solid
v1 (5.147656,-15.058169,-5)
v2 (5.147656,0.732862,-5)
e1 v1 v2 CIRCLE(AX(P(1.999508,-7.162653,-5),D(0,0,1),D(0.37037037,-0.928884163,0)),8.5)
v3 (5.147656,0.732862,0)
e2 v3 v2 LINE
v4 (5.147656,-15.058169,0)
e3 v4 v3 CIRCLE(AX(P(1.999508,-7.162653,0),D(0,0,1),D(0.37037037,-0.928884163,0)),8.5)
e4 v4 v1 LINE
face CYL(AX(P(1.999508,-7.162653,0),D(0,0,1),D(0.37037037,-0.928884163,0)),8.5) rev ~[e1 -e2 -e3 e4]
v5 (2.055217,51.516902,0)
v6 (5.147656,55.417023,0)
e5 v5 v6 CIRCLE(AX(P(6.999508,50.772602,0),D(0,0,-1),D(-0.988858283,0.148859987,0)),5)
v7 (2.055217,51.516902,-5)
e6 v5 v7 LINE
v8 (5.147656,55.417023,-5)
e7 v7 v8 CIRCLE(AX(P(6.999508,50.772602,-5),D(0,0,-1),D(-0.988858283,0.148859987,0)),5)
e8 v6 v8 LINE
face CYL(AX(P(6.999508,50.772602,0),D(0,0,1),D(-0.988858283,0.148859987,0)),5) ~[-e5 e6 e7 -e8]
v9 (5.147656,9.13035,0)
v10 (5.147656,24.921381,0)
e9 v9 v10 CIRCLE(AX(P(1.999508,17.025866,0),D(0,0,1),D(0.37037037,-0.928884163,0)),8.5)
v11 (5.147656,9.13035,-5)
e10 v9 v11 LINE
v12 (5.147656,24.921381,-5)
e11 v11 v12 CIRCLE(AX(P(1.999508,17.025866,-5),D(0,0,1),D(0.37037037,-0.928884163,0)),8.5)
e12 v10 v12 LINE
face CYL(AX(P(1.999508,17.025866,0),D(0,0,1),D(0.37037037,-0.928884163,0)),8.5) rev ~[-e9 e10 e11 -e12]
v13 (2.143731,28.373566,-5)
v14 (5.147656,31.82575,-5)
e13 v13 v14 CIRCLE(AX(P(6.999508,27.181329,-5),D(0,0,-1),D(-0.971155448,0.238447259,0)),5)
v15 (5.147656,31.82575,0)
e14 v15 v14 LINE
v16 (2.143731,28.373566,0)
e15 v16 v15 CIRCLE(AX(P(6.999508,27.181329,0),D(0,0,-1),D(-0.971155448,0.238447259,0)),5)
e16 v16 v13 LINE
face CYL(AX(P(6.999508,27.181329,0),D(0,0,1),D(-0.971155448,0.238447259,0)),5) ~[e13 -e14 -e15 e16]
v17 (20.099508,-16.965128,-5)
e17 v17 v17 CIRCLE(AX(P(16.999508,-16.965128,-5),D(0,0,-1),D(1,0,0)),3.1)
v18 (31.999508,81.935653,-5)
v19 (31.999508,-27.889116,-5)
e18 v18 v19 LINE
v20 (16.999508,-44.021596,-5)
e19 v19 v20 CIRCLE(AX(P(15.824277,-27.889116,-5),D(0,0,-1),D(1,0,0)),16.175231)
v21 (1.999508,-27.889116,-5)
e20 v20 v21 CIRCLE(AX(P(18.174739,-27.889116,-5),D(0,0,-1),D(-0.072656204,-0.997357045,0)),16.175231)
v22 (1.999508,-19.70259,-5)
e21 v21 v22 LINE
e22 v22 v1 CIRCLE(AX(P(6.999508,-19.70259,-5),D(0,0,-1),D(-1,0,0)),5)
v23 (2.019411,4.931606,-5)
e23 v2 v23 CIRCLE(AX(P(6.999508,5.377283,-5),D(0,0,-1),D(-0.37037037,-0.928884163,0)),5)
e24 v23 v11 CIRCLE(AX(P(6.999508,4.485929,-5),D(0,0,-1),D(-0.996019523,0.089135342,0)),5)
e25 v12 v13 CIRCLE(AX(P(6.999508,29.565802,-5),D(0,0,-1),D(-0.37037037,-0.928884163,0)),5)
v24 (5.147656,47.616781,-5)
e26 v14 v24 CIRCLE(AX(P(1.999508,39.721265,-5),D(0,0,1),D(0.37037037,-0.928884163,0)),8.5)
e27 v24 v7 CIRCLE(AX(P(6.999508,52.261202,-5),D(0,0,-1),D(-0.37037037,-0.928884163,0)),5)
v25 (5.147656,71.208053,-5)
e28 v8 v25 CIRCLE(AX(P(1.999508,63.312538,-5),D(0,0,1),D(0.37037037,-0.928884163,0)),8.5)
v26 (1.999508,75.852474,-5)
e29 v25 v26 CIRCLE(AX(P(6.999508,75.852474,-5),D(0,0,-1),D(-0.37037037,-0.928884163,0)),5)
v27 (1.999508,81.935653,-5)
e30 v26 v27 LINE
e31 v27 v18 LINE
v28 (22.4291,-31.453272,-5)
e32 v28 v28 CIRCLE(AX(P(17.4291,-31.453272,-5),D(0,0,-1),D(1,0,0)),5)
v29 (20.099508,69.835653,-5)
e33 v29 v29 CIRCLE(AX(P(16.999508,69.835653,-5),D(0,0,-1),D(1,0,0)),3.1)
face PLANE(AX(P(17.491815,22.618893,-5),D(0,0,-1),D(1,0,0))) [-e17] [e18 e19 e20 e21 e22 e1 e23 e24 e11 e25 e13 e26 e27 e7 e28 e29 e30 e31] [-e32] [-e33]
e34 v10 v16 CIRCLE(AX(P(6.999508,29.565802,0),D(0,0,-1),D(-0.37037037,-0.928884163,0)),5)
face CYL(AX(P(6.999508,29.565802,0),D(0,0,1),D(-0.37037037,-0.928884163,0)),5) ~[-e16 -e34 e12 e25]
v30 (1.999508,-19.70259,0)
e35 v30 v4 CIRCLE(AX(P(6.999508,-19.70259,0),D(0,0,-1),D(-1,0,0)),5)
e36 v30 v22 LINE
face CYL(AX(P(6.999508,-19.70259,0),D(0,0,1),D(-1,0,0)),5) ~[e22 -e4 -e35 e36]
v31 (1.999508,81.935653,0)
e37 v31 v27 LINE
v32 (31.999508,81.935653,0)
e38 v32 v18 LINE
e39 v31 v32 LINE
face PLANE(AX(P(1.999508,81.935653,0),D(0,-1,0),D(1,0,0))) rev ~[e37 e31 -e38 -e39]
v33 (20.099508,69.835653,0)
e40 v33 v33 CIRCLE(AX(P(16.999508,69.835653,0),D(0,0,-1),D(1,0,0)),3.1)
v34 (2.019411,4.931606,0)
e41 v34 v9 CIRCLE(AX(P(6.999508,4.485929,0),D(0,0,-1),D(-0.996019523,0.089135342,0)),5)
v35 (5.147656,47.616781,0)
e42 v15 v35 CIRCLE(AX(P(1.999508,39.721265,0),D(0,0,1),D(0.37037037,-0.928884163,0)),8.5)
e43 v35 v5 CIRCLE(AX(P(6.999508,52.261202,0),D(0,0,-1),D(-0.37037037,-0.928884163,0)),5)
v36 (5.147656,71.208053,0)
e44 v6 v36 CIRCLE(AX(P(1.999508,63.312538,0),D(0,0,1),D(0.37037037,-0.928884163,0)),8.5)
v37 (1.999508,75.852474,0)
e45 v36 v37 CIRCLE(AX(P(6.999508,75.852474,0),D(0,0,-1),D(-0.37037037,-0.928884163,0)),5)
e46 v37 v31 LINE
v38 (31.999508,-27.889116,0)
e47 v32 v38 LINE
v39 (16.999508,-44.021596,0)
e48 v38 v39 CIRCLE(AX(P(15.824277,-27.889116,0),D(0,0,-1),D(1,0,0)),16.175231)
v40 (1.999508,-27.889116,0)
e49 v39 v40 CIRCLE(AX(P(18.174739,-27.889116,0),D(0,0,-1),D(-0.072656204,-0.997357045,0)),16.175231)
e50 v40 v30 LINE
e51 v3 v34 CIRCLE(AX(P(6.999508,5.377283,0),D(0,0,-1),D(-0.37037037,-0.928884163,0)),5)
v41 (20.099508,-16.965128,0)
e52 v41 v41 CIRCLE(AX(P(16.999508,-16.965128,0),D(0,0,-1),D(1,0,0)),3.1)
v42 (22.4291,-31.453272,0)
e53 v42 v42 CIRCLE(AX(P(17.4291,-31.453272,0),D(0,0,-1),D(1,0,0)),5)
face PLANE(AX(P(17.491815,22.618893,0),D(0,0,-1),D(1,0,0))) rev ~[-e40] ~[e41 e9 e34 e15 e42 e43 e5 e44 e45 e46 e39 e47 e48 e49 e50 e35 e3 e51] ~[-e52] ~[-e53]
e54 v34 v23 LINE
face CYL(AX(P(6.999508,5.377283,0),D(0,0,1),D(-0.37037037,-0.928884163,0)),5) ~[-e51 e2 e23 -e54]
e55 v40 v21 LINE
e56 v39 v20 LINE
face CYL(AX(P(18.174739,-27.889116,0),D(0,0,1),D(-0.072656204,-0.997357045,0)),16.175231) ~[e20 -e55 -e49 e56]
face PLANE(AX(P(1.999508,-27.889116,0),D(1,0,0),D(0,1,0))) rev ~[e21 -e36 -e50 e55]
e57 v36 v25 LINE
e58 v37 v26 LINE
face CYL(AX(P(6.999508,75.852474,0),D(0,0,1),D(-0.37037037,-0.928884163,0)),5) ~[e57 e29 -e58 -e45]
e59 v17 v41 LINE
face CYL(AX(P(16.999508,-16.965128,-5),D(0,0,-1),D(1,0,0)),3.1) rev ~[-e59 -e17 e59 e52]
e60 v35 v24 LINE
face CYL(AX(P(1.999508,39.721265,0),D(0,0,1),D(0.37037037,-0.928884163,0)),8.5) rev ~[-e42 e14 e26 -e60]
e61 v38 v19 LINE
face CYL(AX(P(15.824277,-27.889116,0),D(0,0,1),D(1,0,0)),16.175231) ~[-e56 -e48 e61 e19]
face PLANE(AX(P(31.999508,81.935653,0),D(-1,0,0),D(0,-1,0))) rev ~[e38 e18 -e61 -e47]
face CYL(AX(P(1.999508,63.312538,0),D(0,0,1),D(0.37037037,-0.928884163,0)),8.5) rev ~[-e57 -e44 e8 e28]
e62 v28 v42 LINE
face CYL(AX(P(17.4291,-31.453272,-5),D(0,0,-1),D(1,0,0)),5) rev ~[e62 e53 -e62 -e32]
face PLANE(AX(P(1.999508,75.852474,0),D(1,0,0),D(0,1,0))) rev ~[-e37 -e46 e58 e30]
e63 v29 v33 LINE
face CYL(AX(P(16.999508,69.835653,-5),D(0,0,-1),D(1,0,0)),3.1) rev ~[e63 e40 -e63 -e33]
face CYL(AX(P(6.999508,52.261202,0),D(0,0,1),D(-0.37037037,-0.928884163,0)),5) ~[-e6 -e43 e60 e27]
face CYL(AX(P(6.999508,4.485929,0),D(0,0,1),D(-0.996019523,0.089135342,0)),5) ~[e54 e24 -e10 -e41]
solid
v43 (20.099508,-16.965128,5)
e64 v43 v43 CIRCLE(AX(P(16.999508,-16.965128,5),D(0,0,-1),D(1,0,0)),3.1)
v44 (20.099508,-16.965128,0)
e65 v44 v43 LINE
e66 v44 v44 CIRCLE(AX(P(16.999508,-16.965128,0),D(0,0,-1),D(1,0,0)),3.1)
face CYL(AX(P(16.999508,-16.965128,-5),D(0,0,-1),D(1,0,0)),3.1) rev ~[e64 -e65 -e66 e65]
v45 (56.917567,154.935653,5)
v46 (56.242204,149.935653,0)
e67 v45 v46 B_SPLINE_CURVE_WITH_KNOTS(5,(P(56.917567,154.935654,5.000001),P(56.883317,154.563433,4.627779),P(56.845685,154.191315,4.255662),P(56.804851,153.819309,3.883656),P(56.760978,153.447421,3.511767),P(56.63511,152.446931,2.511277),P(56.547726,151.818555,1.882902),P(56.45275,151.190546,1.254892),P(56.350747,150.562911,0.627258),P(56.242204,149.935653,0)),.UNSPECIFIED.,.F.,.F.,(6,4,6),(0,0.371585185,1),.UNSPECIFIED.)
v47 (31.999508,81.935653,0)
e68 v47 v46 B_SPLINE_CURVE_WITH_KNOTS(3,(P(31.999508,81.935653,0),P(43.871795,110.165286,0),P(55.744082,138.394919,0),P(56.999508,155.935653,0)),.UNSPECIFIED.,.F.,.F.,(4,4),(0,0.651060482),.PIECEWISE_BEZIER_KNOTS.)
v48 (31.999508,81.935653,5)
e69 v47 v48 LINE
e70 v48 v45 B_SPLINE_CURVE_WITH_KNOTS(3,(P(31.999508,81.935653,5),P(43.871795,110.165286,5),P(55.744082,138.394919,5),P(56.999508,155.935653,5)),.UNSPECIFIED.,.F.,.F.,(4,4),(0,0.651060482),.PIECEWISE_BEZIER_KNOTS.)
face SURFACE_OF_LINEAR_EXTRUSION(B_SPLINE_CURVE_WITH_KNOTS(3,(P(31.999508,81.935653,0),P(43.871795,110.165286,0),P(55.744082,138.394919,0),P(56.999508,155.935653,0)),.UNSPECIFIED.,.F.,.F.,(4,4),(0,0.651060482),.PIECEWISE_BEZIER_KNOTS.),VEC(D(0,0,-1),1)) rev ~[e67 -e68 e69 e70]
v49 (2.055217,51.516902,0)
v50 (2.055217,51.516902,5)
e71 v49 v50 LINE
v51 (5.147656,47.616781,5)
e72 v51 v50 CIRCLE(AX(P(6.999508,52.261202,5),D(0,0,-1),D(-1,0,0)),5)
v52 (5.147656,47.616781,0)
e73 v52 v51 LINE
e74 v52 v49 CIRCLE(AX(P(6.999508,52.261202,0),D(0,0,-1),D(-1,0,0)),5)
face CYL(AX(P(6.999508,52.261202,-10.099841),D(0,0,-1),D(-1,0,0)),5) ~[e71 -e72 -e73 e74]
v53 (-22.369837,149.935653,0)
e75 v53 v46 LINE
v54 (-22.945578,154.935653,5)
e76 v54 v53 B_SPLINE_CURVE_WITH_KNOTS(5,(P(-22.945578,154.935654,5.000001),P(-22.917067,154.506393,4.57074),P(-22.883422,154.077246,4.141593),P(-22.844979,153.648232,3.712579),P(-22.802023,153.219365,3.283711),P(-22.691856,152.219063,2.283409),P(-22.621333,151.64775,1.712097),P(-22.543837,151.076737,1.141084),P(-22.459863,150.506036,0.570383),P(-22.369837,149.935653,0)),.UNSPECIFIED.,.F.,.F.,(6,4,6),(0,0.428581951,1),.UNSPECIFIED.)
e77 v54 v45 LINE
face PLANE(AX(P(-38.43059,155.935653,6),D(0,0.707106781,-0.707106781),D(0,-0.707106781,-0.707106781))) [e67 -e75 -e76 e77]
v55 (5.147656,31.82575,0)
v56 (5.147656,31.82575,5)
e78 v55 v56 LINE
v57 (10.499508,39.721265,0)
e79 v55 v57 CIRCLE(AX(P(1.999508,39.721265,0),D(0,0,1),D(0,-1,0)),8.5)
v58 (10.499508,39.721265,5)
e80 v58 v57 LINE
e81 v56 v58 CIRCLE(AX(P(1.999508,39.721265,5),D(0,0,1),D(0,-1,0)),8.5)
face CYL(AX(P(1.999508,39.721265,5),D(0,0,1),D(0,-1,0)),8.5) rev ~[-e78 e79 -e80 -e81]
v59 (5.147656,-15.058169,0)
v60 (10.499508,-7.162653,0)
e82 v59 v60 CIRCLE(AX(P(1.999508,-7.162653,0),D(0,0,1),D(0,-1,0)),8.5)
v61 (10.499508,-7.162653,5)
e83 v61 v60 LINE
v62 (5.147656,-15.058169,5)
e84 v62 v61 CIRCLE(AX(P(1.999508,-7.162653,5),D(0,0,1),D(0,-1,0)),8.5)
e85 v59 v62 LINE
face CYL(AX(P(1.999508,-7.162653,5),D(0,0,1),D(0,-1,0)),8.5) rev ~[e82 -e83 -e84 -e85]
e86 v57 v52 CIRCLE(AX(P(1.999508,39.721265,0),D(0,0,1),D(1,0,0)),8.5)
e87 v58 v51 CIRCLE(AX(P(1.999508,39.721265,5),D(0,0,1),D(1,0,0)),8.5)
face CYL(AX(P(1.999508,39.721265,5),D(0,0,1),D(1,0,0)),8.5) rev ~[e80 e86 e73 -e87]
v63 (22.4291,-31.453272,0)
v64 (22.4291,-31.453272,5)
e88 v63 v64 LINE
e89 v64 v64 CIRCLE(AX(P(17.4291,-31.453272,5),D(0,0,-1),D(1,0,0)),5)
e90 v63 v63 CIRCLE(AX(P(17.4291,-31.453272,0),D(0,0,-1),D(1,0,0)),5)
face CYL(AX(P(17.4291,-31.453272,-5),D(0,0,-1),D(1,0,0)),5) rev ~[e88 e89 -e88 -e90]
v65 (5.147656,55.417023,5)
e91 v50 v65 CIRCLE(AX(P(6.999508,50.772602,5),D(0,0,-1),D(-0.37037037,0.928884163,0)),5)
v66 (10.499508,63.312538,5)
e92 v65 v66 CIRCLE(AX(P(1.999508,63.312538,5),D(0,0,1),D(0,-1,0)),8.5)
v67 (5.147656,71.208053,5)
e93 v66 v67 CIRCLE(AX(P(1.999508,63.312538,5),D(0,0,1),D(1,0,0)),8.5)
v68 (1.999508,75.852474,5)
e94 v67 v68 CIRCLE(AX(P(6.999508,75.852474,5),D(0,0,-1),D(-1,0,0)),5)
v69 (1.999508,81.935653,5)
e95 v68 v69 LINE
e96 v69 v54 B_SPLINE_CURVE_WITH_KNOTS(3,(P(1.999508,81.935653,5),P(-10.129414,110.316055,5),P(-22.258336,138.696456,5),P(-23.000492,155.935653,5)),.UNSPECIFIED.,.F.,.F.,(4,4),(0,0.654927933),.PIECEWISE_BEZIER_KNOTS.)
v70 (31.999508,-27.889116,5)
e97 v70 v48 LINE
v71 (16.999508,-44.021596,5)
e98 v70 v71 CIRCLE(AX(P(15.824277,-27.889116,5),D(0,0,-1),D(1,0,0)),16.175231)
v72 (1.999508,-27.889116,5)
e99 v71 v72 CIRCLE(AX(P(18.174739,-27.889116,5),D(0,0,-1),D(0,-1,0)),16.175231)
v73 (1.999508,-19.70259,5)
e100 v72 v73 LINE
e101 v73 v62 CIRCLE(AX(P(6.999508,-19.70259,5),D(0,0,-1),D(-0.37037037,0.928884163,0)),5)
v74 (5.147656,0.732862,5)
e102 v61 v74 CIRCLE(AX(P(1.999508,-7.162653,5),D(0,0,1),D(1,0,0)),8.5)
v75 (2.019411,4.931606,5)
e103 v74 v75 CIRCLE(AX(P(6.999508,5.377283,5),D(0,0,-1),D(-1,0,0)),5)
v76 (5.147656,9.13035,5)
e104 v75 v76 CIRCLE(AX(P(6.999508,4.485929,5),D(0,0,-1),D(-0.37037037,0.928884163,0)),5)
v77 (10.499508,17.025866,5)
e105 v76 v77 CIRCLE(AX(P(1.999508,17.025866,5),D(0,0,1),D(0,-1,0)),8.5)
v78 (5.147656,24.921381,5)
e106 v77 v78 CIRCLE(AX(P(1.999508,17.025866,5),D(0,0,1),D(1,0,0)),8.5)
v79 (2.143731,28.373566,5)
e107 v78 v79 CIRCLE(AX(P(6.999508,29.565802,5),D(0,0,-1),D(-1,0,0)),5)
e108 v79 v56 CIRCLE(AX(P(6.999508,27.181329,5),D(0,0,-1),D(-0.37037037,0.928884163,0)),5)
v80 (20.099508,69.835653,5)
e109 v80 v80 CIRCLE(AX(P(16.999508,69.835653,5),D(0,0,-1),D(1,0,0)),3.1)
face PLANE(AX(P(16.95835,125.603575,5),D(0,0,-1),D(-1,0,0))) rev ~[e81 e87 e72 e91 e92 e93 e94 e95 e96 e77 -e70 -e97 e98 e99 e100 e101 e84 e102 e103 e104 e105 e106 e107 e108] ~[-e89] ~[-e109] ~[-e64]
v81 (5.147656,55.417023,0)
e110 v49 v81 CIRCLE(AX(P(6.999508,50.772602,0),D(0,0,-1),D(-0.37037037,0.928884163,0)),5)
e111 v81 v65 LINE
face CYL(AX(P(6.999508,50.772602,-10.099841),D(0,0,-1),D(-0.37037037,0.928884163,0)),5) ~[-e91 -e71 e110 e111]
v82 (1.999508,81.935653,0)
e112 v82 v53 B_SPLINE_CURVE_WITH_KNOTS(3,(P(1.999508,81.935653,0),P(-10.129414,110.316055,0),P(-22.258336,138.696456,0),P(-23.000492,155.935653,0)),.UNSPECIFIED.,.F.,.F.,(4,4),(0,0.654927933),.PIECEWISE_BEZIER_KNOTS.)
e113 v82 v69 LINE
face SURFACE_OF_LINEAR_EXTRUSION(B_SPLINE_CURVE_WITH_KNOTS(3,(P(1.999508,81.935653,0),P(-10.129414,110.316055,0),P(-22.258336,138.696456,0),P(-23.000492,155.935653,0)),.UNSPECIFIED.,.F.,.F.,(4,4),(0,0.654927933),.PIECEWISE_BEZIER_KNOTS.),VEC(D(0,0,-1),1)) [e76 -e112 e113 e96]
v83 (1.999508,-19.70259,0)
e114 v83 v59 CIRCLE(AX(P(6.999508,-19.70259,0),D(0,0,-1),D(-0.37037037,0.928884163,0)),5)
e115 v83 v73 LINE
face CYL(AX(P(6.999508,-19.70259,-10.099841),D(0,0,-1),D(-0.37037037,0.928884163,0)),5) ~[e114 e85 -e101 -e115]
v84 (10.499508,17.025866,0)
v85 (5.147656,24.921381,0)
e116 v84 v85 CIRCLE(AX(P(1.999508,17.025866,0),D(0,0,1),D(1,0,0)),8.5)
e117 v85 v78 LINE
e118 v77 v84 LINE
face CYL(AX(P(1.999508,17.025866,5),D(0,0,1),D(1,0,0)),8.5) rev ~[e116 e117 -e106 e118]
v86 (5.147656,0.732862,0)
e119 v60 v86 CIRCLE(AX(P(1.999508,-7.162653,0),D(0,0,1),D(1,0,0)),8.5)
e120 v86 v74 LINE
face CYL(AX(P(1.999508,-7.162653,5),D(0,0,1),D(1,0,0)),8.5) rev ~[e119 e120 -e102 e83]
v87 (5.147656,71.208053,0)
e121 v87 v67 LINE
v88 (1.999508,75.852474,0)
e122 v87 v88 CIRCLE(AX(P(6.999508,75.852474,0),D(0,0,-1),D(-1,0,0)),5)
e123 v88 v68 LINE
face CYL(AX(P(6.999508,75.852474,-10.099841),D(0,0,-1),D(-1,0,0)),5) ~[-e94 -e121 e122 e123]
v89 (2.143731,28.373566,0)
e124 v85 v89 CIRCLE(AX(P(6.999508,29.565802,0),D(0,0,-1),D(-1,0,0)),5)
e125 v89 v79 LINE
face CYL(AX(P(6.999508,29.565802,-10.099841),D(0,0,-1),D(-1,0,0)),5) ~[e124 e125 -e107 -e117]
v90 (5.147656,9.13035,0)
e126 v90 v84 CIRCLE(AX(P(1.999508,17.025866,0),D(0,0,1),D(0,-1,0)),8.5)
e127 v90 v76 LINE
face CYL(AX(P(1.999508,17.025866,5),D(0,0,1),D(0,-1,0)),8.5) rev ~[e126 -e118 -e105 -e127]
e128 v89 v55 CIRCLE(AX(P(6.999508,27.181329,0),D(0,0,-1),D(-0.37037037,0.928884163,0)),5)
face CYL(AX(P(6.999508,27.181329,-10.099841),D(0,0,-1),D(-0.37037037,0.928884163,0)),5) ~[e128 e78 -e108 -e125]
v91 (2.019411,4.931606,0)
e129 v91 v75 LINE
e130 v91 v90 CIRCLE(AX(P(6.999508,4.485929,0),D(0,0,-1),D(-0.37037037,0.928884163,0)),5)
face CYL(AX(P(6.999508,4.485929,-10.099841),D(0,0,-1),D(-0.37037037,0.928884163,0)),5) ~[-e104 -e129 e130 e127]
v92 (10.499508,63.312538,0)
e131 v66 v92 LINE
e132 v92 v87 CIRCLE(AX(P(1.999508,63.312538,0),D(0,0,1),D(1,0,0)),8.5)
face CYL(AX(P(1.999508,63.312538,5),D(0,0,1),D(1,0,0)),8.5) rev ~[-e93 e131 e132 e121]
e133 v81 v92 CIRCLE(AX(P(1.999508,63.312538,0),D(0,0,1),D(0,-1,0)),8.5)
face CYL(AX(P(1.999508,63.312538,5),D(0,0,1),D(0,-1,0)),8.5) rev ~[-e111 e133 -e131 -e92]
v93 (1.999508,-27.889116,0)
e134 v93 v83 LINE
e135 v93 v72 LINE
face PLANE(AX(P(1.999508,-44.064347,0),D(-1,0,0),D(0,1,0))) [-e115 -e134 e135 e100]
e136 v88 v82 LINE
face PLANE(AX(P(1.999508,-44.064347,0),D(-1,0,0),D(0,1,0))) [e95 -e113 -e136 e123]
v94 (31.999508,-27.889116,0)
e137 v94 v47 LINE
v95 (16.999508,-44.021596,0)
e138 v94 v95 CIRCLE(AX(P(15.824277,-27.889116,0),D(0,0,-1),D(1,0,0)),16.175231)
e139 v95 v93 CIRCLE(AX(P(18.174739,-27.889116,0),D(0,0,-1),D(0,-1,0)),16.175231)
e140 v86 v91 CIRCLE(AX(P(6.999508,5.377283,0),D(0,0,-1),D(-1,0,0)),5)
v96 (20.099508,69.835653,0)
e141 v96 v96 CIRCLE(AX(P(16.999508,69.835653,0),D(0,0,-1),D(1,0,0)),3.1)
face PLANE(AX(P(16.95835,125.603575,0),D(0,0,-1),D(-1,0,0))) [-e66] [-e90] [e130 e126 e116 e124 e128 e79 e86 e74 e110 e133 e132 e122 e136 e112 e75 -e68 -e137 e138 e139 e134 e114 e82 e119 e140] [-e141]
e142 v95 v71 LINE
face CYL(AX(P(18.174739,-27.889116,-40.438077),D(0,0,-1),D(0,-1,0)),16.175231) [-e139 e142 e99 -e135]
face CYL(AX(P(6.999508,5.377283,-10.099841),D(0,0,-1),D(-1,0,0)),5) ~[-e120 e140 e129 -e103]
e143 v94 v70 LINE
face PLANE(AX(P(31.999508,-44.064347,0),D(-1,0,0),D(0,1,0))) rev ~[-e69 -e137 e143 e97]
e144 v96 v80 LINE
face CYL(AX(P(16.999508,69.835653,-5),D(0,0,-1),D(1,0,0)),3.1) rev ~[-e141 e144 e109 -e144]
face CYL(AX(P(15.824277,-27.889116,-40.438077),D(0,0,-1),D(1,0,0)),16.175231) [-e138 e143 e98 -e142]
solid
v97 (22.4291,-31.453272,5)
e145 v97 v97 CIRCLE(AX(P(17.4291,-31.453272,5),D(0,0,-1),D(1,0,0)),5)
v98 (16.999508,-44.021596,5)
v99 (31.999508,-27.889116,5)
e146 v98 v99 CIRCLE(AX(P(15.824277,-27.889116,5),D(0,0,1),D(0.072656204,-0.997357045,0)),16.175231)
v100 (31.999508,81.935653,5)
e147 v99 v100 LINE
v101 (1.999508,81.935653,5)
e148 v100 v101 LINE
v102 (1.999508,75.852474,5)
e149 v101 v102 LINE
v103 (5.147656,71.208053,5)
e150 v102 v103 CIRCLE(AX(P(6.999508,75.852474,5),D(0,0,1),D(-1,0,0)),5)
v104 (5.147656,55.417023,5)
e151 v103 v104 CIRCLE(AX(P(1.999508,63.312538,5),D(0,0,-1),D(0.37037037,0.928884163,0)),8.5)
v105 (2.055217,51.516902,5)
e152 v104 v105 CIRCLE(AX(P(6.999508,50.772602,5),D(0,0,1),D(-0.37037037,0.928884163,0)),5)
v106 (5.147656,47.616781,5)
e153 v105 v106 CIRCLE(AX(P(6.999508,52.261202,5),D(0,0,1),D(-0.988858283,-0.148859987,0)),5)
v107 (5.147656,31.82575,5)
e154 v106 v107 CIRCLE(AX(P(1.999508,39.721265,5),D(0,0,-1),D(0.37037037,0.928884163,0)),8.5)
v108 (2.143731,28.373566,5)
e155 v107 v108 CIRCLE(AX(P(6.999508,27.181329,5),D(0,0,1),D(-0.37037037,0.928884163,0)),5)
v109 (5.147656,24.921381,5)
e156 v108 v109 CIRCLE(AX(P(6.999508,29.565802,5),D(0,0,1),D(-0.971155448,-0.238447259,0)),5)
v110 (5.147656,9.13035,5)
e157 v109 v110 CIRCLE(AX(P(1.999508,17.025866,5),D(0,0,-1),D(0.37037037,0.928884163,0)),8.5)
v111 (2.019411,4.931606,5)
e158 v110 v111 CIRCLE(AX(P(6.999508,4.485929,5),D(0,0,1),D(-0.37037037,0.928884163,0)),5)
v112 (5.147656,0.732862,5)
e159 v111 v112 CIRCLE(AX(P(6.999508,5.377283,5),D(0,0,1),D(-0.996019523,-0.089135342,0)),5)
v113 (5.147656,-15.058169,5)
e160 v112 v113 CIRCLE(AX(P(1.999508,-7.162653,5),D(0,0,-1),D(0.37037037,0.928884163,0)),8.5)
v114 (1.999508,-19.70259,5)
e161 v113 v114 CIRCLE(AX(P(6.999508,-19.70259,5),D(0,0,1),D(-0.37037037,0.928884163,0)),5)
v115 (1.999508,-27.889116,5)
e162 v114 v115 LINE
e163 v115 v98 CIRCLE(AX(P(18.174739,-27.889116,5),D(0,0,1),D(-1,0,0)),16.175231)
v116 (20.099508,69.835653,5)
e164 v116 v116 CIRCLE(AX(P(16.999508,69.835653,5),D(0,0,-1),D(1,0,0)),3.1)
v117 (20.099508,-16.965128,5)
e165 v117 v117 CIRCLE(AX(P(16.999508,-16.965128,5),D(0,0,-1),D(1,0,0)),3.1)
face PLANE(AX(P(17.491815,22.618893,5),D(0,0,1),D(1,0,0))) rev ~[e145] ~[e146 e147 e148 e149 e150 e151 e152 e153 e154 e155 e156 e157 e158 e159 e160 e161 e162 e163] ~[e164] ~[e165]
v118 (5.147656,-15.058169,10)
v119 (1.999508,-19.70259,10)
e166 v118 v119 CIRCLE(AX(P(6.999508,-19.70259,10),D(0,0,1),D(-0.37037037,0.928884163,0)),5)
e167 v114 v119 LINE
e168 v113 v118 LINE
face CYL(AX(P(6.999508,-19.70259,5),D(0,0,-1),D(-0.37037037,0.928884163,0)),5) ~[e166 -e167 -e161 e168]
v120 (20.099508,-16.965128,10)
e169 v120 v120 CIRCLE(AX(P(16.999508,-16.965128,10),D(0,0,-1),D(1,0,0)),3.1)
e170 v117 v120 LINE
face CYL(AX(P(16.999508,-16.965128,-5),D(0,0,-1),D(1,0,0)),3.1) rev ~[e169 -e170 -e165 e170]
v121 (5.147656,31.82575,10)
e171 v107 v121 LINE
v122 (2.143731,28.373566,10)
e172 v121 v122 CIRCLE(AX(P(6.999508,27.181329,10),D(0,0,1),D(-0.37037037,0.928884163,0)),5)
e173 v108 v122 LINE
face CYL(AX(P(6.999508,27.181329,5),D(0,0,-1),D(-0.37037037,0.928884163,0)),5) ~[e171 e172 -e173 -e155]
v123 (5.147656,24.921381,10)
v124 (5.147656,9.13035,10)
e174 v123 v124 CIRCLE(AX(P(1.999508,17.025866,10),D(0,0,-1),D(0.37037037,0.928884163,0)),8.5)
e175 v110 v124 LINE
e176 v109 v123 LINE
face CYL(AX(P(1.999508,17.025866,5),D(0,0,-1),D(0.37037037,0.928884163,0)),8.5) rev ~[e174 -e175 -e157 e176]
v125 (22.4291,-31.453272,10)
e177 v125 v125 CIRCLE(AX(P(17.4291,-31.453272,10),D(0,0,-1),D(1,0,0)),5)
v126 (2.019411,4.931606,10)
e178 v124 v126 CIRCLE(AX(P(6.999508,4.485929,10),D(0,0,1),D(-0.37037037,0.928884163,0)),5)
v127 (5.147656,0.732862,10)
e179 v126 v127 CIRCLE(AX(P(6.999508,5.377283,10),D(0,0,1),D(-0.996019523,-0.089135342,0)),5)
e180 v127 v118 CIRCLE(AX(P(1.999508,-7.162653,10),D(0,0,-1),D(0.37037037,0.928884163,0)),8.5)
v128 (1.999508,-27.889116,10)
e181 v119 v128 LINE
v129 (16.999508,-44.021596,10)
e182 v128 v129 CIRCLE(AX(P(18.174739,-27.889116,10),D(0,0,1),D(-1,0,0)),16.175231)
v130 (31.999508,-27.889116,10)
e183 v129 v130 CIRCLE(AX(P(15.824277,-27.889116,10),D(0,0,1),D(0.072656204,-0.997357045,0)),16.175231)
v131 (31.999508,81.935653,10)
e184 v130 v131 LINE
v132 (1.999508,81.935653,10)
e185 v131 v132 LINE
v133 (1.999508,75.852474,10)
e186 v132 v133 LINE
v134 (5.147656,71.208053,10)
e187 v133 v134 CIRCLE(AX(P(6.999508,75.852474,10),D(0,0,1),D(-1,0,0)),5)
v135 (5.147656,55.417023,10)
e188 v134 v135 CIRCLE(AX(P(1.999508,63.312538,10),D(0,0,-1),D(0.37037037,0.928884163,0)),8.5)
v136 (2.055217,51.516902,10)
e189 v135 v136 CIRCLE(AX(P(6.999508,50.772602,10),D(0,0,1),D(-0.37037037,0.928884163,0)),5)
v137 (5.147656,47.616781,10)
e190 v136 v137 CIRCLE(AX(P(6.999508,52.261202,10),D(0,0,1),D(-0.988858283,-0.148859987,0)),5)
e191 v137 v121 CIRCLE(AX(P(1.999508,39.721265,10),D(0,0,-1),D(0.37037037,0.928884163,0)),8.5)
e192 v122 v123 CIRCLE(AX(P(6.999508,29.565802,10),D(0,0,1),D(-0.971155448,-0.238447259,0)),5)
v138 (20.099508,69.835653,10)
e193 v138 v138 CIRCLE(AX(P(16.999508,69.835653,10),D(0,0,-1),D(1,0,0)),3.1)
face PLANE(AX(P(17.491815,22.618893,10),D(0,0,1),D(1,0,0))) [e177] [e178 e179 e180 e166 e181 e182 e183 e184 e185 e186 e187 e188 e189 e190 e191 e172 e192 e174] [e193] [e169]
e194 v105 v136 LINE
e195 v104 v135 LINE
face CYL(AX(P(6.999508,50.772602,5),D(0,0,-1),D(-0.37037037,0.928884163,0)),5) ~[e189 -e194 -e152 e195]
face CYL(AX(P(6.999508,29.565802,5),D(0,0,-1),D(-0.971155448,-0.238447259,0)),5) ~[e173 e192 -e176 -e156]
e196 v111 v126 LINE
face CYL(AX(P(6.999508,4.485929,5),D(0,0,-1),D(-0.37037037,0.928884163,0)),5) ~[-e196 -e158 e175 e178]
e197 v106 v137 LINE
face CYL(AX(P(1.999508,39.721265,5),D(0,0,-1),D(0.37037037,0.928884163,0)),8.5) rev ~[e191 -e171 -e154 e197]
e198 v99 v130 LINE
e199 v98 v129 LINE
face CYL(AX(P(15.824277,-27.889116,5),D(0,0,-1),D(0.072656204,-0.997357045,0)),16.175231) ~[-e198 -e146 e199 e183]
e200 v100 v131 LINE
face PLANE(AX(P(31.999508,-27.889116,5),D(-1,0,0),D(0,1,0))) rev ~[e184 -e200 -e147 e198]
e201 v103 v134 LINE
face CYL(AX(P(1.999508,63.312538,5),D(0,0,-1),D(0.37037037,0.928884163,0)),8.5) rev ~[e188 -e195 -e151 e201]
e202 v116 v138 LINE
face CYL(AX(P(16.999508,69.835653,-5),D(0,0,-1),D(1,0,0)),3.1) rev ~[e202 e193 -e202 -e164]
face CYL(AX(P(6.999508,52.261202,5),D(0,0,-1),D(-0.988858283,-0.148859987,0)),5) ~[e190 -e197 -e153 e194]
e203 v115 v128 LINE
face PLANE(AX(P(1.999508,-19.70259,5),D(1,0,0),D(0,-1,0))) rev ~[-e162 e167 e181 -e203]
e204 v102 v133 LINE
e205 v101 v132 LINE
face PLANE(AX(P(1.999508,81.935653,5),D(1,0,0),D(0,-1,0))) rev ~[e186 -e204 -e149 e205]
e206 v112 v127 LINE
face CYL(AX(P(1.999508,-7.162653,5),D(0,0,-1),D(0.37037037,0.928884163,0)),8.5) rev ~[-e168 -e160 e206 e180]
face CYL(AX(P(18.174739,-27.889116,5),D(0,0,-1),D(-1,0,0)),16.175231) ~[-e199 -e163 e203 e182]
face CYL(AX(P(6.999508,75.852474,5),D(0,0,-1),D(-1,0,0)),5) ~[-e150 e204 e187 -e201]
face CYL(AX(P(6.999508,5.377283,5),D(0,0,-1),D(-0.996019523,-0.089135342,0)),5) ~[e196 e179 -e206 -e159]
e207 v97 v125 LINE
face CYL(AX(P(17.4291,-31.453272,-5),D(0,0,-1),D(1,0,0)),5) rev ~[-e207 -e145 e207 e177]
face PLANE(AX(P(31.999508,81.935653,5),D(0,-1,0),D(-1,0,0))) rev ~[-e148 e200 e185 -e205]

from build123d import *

# Parameters (mm, degrees)
F0_W         = 30
F0_H         = 126
F1_DEPTH     = 5
F2_T1_DEPTH  = 85.8761543395
F4_DEPTH     = 25
F5_T1_DEPTH  = 25.1996810199
F7_DEPTH     = 5
F9_DEPTH     = 5
F10_T1_DEPTH = 110.8601958556
F11_R        = 3.1
F11_R_2      = 5
F12_DEPTH    = 83.8


# Not quite as in the source:
# - a fillet or chamfer that OpenCascade refuses, or shapes differently, is made with other operations: its cross-section is extruded or revolved along the edge and cut away or added


with BuildPart() as f1:
    # F0 (on Top) → F1 (new body)
    with BuildSketch(Plane.XY):
        with BuildLine():
            add(Edge.make_bspline(
                [(1.999508217, 81.9356532991), (-10.1294136818, 110.3160546729), (-22.2583355805, 138.6964560467), (-23.000491783, 155.9356532991)],
                knots=[0, 0, 0, 0, 0.6549279326, 0.6549279326, 0.6549279326, 0.6549279326], degree=3))
            Line((1.999508217, 81.9356532991), (31.999508217, 81.9356532991))
            add(Edge.make_bspline(
                [(31.999508217, 81.9356532991), (43.8717951109, 110.1652859419), (55.7440820049, 138.3949185848), (56.999508217, 155.9356532991)],
                knots=[0, 0, 0, 0, 0.6510604818, 0.6510604818, 0.6510604818, 0.6510604818], degree=3))
            Line((56.999508217, 155.9356532991), (-23.000491783, 155.9356532991))
        make_face()
        with Locations((16.999508217, 18.9356532991)):
            Rectangle(F0_W, F0_H)
    extrude(amount=F1_DEPTH)

    # F2: fillet of radius 16.1752308679 on 2 edges, made by hand

    # F2_s2 → F2_t1 (cut)
    with BuildSketch(Plane.XY.offset(-40.4380771697)):
        with BuildLine():
            ThreePointArc((18.1747390849, -44.0643467009), (6.7371236509, -39.326731267), (1.999508217, -27.889115833))
            Line((1.999508217, -27.889115833), (1.999508217, -44.0643467009))
            Line((1.999508217, -44.0643467009), (18.1747390849, -44.0643467009))
        make_face()
        with BuildLine():
            ThreePointArc((31.999508217, -27.889115833), (27.261892783, -39.326731267), (15.8242773491, -44.0643467009))
            Line((15.8242773491, -44.0643467009), (31.999508217, -44.0643467009))
            Line((31.999508217, -44.0643467009), (31.999508217, -27.889115833))
        make_face()
    extrude(amount=F2_T1_DEPTH, mode=Mode.SUBTRACT)

    # F3 (on face) → F4 (cut)
    with BuildSketch(Plane.XY.offset(5)):
        with BuildLine():
            ThreePointArc((10.499508217, -7.1626533754), (8.0099158571, -1.1522457353), (1.999508217, 1.3373466246))
            Line((1.999508217, 1.3373466246), (1.999508217, -15.6626533754))
            ThreePointArc((1.999508217, -15.6626533754), (8.0099158571, -13.1730610155), (10.499508217, -7.1626533754))
        make_face()
        with BuildLine():
            ThreePointArc((10.499508217, 17.0258656144), (8.0099158571, 23.0362732545), (1.999508217, 25.5258656144))
            Line((1.999508217, 25.5258656144), (1.999508217, 8.5258656144))
            ThreePointArc((1.999508217, 8.5258656144), (8.0099158571, 11.0154579743), (10.499508217, 17.0258656144))
        make_face()
        with BuildLine():
            ThreePointArc((10.499508217, 39.7212654352), (8.0099158571, 45.7316730753), (1.999508217, 48.2212654352))
            Line((1.999508217, 48.2212654352), (1.999508217, 31.2212654352))
            ThreePointArc((1.999508217, 31.2212654352), (8.0099158571, 33.7108577951), (10.499508217, 39.7212654352))
        make_face()
        with BuildLine():
            ThreePointArc((1.999508217, 54.8125379682), (8.0099158571, 57.3021303281), (10.499508217, 63.3125379682))
            ThreePointArc((10.499508217, 63.3125379682), (8.0099158571, 69.3229456082), (1.999508217, 71.8125379682))
            Line((1.999508217, 71.8125379682), (1.999508217, 54.8125379682))
        make_face()
    extrude(amount=-F4_DEPTH, mode=Mode.SUBTRACT)

    # F5: fillet of radius 5 on 8 edges, made by hand

    # F5_s2 → F5_t1 (cut)
    with BuildSketch(Plane.XY.offset(-10.09984051)):
        with BuildLine():
            ThreePointArc((5.1476563651, -15.0581687631), (2.8607125432, -16.897171541), (1.999508217, -19.7025895794))
            Line((1.999508217, -19.7025895794), (1.999508217, -15.6626533754))
            ThreePointArc((1.999508217, -15.6626533754), (3.6023368423, -15.5101644055), (5.1476563651, -15.0581687631))
        make_face()
        with BuildLine():
            ThreePointArc((1.999508217, 5.3772828286), (2.8607125432, 2.5718647901), (5.1476563651, 0.7328620123))
            ThreePointArc((5.1476563651, 0.7328620123), (3.6023368423, 1.1848576547), (1.999508217, 1.3373466246))
            Line((1.999508217, 1.3373466246), (1.999508217, 5.3772828286))
        make_face()
        with BuildLine():
            ThreePointArc((5.1476563651, 9.1303502267), (2.8607125432, 7.2913474489), (1.999508217, 4.4859294104))
            Line((1.999508217, 4.4859294104), (1.999508217, 8.5258656144))
            ThreePointArc((1.999508217, 8.5258656144), (3.6023368423, 8.6783545843), (5.1476563651, 9.1303502267))
        make_face()
        with BuildLine():
            ThreePointArc((1.999508217, 29.5658018184), (2.8607125432, 26.76038378), (5.1476563651, 24.9213810021))
            ThreePointArc((5.1476563651, 24.9213810021), (3.6023368423, 25.3733766445), (1.999508217, 25.5258656144))
            Line((1.999508217, 25.5258656144), (1.999508217, 29.5658018184))
        make_face()
        with BuildLine():
            ThreePointArc((5.1476563651, 31.8257500475), (2.8607125432, 29.9867472697), (1.999508217, 27.1813292312))
            Line((1.999508217, 27.1813292312), (1.999508217, 31.2212654352))
            ThreePointArc((1.999508217, 31.2212654352), (3.6023368423, 31.3737544051), (5.1476563651, 31.8257500475))
        make_face()
        with BuildLine():
            ThreePointArc((1.999508217, 52.2612016392), (2.8607125432, 49.4557836008), (5.1476563651, 47.6167808229))
            ThreePointArc((5.1476563651, 47.6167808229), (3.6023368423, 48.0687764653), (1.999508217, 48.2212654352))
            Line((1.999508217, 48.2212654352), (1.999508217, 52.2612016392))
        make_face()
        with BuildLine():
            ThreePointArc((5.1476563651, 55.4170225805), (2.8607125432, 53.5780198026), (1.999508217, 50.7726017642))
            Line((1.999508217, 50.7726017642), (1.999508217, 54.8125379682))
            ThreePointArc((1.999508217, 54.8125379682), (3.6023368423, 54.9650269381), (5.1476563651, 55.4170225805))
        make_face()
        with BuildLine():
            ThreePointArc((1.999508217, 75.8524741721), (2.8607125432, 73.0470561337), (5.1476563651, 71.2080533559))
            ThreePointArc((5.1476563651, 71.2080533559), (3.6023368423, 71.6600489983), (1.999508217, 71.8125379682))
            Line((1.999508217, 71.8125379682), (1.999508217, 75.8524741721))
        make_face()
    extrude(amount=F5_T1_DEPTH, mode=Mode.SUBTRACT)

    # F10: chamfer of 6 on 1 edges, made by hand

    # F10_s2 → F10_t1 (cut)
    with BuildSketch(Plane.YZ.offset(-38.4305897108)):
        Polygon((155.9356532991, 6), (149.9356532991, 0), (155.9356532991, 0), align=None)
    extrude(amount=F10_T1_DEPTH, mode=Mode.SUBTRACT)


with BuildPart() as f7:
    # F6 (on face) → F7 (new body)
    with BuildSketch(Plane.XY.offset(5)):
        with BuildLine():
            Line((31.999508217, 81.9356532991), (1.999508217, 81.9356532991))
            Line((1.999508217, 81.9356532991), (1.999508217, 75.8524741721))
            ThreePointArc((1.999508217, 75.8524741721), (2.8607125432, 73.0470561337), (5.1476563651, 71.2080533559))
            ThreePointArc((5.1476563651, 71.2080533559), (10.499508217, 63.3125379682), (5.1476563651, 55.4170225805))
            ThreePointArc((5.1476563651, 55.4170225805), (3.0816482724, 53.8791067866), (2.0552168014, 51.5169017017))
            ThreePointArc((2.0552168014, 51.5169017017), (3.0816482724, 49.1546966168), (5.1476563651, 47.6167808229))
            ThreePointArc((5.1476563651, 47.6167808229), (10.499508217, 39.7212654352), (5.1476563651, 31.8257500475))
            ThreePointArc((5.1476563651, 31.8257500475), (3.227576814, 30.4634830197), (2.1437309754, 28.3735655249))
            ThreePointArc((2.1437309754, 28.3735655249), (3.227576814, 26.2836480299), (5.1476563651, 24.9213810021))
            ThreePointArc((5.1476563651, 24.9213810021), (10.499508217, 17.0258656144), (5.1476563651, 9.1303502267))
            ThreePointArc((5.1476563651, 9.1303502267), (2.989988744, 7.4731946473), (2.0194106004, 4.9316061195))
            ThreePointArc((2.0194106004, 4.9316061195), (2.989988744, 2.3900175917), (5.1476563651, 0.7328620123))
            ThreePointArc((5.1476563651, 0.7328620123), (10.499508217, -7.1626533754), (5.1476563651, -15.0581687631))
            ThreePointArc((5.1476563651, -15.0581687631), (2.8607125432, -16.897171541), (1.999508217, -19.7025895794))
            Line((1.999508217, -19.7025895794), (1.999508217, -27.889115833))
            ThreePointArc((1.999508217, -27.889115833), (6.3289017518, -38.9033898222), (16.9995082169, -44.0215963006))
            ThreePointArc((16.9995082169, -44.0215963006), (27.6701146821, -38.9033898222), (31.999508217, -27.889115833))
            Line((31.999508217, -27.889115833), (31.999508217, 81.9356532991))
        make_face()
    extrude(amount=F7_DEPTH)


with BuildPart() as f9:
    # F8 (on face) → F9 (new body)
    with BuildSketch(Plane(origin=(0, 0, 0), x_dir=(1, 0, 0), z_dir=(0, 0, -1))):
        with BuildLine():
            Line((1.999508217, -75.8524741721), (1.999508217, -81.9356532991))
            Line((1.999508217, -81.9356532991), (31.999508217, -81.9356532991))
            Line((31.999508217, -81.9356532991), (31.999508217, 27.889115833))
            ThreePointArc((31.999508217, 27.889115833), (27.6701146821, 38.9033898222), (16.9995082169, 44.0215963006))
            ThreePointArc((16.9995082169, 44.0215963006), (6.3289017518, 38.9033898222), (1.999508217, 27.889115833))
            Line((1.999508217, 27.889115833), (1.999508217, 19.7025895794))
            ThreePointArc((1.999508217, 19.7025895794), (2.8607125432, 16.897171541), (5.1476563651, 15.0581687631))
            ThreePointArc((5.1476563651, 15.0581687631), (10.499508217, 7.1626533754), (5.1476563651, -0.7328620123))
            ThreePointArc((5.1476563651, -0.7328620123), (2.989988744, -2.3900175917), (2.0194106004, -4.9316061195))
            ThreePointArc((2.0194106004, -4.9316061195), (2.989988744, -7.4731946473), (5.1476563651, -9.1303502267))
            ThreePointArc((5.1476563651, -9.1303502267), (10.499508217, -17.0258656144), (5.1476563651, -24.9213810021))
            ThreePointArc((5.1476563651, -24.9213810021), (3.227576814, -26.2836480299), (2.1437309754, -28.3735655249))
            ThreePointArc((2.1437309754, -28.3735655249), (3.227576814, -30.4634830197), (5.1476563651, -31.8257500475))
            ThreePointArc((5.1476563651, -31.8257500475), (10.499508217, -39.7212654352), (5.1476563651, -47.6167808229))
            ThreePointArc((5.1476563651, -47.6167808229), (3.0816482724, -49.1546966168), (2.0552168014, -51.5169017017))
            ThreePointArc((2.0552168014, -51.5169017017), (3.0816482724, -53.8791067866), (5.1476563651, -55.4170225805))
            ThreePointArc((5.1476563651, -55.4170225805), (10.499508217, -63.3125379682), (5.1476563651, -71.2080533559))
            ThreePointArc((5.1476563651, -71.2080533559), (2.8607125432, -73.0470561337), (1.999508217, -75.8524741721))
        make_face()
    extrude(amount=F9_DEPTH)


with BuildPart() as f12_tool:
    # F11 (on face) → F12 (new body)
    with BuildSketch(Plane(origin=(0, 0, -5), x_dir=(1, 0, 0), z_dir=(0, 0, -1))):
        with Locations((16.999508217, -69.8356532991)):
            Circle(F11_R)
        with Locations((16.999508217, 16.9651284814)):
            Circle(F11_R)
        with Locations((17.429100106, 31.4532717611)):
            Circle(F11_R_2)
    extrude(amount=-F12_DEPTH)


with BuildPart() as f1_1:
    add(f1.part)

    # F12: cut by f12_tool
    add(f12_tool.part, mode=Mode.SUBTRACT)


with BuildPart() as f7_1:
    add(f7.part)

    # F12: cut by f12_tool
    add(f12_tool.part, mode=Mode.SUBTRACT)


with BuildPart() as f9_1:
    add(f9.part)

    # F12: cut by f12_tool
    add(f12_tool.part, mode=Mode.SUBTRACT)


solid = Compound([f1_1.part, f7_1.part, f9_1.part])
